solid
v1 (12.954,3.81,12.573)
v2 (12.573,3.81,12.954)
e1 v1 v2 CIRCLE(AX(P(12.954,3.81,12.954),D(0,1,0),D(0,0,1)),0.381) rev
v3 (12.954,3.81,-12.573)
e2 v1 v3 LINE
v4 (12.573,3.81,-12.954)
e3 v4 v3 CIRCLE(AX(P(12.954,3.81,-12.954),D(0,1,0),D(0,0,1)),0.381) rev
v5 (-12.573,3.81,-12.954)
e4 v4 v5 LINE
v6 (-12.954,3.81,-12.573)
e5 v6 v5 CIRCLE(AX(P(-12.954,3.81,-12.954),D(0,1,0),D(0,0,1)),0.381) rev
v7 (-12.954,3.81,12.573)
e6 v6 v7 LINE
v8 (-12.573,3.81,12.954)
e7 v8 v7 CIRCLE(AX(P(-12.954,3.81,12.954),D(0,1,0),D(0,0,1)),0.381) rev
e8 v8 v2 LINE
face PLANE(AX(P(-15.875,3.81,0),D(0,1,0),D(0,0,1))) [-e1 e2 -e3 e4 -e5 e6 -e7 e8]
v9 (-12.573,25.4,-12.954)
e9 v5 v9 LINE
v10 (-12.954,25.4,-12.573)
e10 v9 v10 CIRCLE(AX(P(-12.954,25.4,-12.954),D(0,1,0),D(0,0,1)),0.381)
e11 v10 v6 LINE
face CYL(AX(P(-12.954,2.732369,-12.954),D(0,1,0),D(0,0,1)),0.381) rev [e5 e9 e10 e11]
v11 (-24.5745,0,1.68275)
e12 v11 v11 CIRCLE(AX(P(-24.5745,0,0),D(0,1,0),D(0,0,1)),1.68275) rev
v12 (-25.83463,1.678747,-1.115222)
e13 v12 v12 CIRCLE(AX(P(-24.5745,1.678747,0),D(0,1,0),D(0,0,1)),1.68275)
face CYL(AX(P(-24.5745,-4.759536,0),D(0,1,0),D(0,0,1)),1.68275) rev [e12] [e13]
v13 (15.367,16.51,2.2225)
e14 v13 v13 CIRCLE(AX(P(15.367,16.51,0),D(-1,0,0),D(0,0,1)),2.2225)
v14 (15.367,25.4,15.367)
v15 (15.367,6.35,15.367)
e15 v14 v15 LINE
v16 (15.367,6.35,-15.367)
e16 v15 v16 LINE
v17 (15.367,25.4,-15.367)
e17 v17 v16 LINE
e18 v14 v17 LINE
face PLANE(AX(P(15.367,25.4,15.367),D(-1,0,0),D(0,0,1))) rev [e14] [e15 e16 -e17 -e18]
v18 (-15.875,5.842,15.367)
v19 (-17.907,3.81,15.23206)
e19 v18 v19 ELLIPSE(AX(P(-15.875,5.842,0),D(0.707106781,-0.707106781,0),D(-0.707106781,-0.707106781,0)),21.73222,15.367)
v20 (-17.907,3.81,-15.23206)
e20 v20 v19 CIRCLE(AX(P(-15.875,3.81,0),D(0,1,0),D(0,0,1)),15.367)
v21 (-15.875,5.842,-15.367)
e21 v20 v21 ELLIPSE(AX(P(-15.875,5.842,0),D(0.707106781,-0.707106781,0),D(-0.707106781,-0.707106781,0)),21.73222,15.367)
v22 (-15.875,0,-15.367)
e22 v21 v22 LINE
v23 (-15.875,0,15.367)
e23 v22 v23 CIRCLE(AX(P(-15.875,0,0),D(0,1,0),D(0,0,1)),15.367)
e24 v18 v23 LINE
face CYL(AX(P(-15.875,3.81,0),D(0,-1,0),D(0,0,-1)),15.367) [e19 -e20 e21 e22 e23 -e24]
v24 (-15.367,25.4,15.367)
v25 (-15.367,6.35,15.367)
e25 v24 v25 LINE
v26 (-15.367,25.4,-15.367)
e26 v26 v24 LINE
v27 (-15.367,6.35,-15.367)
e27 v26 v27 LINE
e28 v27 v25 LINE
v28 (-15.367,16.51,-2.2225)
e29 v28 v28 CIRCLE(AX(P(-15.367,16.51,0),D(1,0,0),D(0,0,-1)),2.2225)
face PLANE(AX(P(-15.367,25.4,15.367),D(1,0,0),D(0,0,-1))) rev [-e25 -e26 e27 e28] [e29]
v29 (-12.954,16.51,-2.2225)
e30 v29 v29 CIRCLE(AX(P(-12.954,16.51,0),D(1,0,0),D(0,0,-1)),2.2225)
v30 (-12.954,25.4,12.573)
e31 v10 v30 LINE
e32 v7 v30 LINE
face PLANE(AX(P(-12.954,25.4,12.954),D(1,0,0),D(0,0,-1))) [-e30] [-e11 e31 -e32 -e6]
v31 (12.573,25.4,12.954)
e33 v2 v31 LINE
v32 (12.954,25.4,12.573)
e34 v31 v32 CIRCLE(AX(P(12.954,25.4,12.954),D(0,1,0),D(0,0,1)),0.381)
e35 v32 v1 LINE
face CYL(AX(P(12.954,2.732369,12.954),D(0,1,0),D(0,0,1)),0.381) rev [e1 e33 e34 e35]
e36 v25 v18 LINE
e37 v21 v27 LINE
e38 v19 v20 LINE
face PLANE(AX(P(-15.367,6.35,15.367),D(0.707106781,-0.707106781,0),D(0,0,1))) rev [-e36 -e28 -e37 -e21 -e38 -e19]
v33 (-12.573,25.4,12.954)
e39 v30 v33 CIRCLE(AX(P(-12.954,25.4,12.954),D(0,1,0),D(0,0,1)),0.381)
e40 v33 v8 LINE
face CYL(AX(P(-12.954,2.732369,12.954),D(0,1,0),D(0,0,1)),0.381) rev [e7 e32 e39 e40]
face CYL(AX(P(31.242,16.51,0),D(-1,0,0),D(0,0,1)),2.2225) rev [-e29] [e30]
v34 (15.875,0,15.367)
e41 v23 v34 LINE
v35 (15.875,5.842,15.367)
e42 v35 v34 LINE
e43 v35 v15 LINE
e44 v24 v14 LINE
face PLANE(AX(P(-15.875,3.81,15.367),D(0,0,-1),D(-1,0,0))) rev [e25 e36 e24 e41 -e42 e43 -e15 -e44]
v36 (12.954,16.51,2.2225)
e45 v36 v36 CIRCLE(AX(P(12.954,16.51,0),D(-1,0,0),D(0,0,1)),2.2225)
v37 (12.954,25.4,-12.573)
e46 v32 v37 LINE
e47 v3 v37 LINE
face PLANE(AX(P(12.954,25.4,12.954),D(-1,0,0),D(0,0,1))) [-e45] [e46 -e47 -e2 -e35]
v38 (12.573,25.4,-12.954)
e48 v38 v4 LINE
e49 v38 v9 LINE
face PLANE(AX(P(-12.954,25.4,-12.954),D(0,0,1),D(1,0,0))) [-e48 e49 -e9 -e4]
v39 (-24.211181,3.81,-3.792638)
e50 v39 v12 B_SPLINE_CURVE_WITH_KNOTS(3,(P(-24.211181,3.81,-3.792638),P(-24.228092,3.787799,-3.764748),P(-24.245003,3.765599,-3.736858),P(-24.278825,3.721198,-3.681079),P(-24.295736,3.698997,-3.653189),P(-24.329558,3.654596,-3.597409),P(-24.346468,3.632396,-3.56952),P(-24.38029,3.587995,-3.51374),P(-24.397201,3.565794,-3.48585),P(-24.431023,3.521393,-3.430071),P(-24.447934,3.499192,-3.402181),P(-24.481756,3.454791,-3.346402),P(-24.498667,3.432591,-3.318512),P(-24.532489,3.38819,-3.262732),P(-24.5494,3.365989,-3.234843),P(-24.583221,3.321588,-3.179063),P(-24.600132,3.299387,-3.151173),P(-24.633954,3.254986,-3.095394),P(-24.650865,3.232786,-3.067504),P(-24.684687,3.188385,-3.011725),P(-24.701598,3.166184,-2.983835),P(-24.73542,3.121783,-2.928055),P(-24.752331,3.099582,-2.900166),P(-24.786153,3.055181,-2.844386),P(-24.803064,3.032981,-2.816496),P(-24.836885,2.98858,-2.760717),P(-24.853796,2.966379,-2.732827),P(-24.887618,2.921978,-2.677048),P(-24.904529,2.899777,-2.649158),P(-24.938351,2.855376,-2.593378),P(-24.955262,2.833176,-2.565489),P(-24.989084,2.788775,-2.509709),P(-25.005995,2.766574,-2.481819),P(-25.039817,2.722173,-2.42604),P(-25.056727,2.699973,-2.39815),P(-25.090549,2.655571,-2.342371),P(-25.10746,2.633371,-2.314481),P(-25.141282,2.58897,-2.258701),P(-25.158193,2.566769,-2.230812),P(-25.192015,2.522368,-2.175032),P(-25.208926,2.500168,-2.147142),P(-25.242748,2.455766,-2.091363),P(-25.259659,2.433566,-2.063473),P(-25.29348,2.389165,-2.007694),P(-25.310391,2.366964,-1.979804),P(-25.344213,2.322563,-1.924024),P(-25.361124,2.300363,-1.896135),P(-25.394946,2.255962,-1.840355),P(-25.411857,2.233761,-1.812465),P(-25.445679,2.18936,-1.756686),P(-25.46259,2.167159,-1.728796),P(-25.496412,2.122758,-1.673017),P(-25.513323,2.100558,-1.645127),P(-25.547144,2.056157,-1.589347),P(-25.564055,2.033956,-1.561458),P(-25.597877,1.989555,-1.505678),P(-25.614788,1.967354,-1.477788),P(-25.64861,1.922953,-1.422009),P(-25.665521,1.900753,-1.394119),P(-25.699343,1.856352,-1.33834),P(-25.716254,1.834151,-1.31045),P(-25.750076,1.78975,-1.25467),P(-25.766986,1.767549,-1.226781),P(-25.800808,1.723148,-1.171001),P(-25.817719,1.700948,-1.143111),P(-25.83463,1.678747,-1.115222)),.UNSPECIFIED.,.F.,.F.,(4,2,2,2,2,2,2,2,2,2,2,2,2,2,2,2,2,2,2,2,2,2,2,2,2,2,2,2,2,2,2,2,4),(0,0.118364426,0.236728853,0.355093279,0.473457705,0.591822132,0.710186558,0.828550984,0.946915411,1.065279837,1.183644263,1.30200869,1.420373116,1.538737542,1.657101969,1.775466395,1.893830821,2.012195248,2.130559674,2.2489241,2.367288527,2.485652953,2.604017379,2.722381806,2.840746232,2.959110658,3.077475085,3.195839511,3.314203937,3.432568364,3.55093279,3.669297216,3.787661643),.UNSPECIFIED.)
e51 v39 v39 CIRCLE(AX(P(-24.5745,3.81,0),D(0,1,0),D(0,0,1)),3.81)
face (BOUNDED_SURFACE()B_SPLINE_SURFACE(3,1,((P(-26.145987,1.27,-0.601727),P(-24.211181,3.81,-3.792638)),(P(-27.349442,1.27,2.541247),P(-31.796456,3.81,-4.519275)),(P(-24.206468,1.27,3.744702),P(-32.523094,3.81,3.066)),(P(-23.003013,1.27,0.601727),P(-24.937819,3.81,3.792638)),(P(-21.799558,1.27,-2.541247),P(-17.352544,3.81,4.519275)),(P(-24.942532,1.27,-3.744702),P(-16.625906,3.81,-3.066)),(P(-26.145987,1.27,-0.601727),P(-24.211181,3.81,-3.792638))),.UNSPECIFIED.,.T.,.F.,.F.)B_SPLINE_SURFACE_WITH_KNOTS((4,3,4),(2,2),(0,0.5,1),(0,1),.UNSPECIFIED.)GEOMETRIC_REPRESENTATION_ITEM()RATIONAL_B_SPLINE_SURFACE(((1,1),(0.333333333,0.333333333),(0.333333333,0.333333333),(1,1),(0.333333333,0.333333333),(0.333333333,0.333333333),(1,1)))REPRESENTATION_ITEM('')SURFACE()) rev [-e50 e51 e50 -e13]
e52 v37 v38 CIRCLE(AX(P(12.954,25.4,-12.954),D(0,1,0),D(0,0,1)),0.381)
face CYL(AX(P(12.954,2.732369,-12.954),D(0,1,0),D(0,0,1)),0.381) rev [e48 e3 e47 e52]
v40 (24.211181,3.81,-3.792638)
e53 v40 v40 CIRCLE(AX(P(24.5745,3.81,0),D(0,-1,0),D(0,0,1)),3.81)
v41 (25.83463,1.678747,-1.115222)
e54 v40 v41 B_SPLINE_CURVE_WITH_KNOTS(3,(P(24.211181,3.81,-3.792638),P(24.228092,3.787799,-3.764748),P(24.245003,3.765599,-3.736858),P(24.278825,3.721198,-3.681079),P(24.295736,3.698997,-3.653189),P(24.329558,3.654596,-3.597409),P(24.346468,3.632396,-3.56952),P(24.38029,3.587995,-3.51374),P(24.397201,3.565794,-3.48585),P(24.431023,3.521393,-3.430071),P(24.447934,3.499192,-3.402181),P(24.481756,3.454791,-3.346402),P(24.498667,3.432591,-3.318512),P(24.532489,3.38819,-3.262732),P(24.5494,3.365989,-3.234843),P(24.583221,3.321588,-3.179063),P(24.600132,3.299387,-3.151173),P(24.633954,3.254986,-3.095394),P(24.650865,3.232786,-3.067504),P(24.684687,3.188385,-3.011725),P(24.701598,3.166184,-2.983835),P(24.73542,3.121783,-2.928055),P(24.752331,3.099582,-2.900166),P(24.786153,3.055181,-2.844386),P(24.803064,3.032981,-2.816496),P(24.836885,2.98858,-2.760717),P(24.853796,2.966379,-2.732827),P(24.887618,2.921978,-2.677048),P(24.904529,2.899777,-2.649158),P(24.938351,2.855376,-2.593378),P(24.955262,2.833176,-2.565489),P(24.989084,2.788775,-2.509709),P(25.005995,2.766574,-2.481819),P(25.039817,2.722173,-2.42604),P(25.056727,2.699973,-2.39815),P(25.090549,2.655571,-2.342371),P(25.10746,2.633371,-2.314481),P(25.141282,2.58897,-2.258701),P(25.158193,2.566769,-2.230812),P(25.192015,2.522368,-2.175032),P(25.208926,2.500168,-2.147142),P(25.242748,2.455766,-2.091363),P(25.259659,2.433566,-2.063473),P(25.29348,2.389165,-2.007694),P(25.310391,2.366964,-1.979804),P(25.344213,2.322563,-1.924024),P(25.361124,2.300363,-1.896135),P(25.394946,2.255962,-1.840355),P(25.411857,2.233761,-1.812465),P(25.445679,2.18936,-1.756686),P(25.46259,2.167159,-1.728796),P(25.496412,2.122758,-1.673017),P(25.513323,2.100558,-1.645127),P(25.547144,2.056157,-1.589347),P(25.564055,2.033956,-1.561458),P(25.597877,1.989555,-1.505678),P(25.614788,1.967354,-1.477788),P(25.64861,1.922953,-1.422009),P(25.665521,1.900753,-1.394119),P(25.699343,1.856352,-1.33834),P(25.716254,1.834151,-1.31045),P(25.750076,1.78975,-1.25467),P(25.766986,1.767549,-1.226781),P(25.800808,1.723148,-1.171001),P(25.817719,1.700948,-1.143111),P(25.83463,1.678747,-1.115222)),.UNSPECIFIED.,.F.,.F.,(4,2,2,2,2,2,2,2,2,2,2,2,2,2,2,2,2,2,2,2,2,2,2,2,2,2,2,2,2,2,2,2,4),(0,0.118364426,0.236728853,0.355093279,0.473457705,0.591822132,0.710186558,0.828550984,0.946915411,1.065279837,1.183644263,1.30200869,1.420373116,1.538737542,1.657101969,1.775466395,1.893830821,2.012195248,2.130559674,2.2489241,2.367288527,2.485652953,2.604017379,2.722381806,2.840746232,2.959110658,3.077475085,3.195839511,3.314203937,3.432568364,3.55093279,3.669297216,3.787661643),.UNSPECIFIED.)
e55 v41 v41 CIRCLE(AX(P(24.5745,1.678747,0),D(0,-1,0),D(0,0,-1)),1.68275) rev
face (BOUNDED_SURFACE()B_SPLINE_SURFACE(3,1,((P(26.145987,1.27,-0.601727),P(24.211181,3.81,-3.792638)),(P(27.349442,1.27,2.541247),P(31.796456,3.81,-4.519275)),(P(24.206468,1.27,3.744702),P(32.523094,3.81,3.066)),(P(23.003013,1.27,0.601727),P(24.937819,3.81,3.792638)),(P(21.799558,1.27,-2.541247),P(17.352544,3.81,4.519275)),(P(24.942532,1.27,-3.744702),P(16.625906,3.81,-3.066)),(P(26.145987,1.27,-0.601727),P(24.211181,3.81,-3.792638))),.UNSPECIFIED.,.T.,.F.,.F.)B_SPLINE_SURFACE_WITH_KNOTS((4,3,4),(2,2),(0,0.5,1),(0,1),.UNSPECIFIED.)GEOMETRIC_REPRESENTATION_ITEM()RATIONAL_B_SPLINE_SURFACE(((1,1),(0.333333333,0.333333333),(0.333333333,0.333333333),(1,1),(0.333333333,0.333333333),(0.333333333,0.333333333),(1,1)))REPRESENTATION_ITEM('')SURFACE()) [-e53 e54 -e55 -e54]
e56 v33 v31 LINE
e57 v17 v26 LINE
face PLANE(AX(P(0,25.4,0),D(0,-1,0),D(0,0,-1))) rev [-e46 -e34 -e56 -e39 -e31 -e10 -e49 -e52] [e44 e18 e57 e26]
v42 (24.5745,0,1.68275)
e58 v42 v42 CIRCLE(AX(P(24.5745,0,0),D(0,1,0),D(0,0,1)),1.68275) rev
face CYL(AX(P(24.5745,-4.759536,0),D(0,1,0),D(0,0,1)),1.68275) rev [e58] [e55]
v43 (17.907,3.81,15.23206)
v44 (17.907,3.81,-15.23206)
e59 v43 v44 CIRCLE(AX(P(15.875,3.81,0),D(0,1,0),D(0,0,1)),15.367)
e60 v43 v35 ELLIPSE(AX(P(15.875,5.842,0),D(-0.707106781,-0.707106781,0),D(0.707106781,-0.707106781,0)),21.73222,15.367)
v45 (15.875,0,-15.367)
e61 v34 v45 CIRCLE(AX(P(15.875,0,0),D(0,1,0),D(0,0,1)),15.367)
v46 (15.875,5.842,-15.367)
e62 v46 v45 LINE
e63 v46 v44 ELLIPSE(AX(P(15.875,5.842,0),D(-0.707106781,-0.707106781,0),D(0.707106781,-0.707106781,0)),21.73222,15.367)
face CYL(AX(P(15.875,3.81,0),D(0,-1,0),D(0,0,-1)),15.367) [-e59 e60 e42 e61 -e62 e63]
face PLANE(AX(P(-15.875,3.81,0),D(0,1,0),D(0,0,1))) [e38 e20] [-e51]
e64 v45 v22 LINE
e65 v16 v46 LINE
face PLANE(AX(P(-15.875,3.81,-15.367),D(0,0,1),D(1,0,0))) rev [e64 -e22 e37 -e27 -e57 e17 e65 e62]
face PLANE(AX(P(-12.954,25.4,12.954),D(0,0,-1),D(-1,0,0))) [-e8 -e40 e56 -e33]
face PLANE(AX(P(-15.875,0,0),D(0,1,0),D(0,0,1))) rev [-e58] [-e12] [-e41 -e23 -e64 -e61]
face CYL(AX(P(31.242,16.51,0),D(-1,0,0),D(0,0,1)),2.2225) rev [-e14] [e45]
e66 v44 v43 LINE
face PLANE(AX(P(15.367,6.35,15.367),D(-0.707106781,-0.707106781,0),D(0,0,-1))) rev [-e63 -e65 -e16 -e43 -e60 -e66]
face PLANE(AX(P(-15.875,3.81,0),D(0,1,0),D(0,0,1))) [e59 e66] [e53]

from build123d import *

# Parameters (mm, degrees)
BOSS_EXTRUDE1_DEPTH     = 3.81
SKETCH2_W               = 30.734
SKETCH2_H               = 30.734
SKETCH2_W_2             = 25.908
SKETCH2_H_2             = 25.908
BOSS_EXTRUDE2_DEPTH     = 21.59
CHAMFER1_SIZE           = 2.54
SKETCH3_R               = 1.68275
CUT_EXTRUDE1_DEPTH      = 3.81
CUT_EXTRUDE2_DEPTH      = 54.240878222
CUT_EXTRUDE2_DEPTH_BACK = 54.240878222
SKETCH6_R               = 2.2225
SKETCH8_R               = 0.381
CUT_EXTRUDE3_DEPTH      = 21.59


with BuildPart() as part:
    # Sketch1 → Boss-Extrude1 (new body)
    with BuildSketch(Plane(origin=(0, 0, 0), x_dir=(1, 0, 0), z_dir=(0, 1, 0))):
        with BuildLine():
            Line((-15.875, 15.367), (15.875, 15.367))
            ThreePointArc((15.875, 15.367), (31.242, 0), (15.875, -15.367))
            Line((15.875, -15.367), (-15.875, -15.367))
            ThreePointArc((-15.875, -15.367), (-31.242, 0), (-15.875, 15.367))
        make_face()
    extrude(amount=BOSS_EXTRUDE1_DEPTH)

    # Sketch2 → Boss-Extrude2 (add)
    with BuildSketch(Plane(origin=(0, 3.81, 0), x_dir=(1, 0, 0), z_dir=(0, 1, 0))):
        Rectangle(SKETCH2_W, SKETCH2_H)
        Rectangle(SKETCH2_W_2, SKETCH2_H_2, mode=Mode.SUBTRACT)
    extrude(amount=BOSS_EXTRUDE2_DEPTH)

    # Chamfer1
    chamfer1_edges = [part.edges().sort_by_distance(p)[0] for p in [
        (15.367, 3.81, 0),
        (-15.367, 3.81, 0),
    ]]
    chamfer(chamfer1_edges, length=CHAMFER1_SIZE)

    # Sketch3 → Cut-Extrude1 (cut)
    with BuildSketch(Plane(origin=(0, 3.81, 0), x_dir=(1, 0, 0), z_dir=(0, 1, 0))):
        with Locations(Location((-24.5745, 0, 0), (0, 0, 270))):
            Circle(SKETCH3_R)
        with Locations(Location((24.5745, 0, 0), (0, 0, 270))):
            Circle(SKETCH3_R)
    extrude(amount=-CUT_EXTRUDE1_DEPTH, mode=Mode.SUBTRACT)

    # Cut-Loft1: read off the stored shape, not the designer's step
    # Cut-Loft1: loft between two sections, ruled curve by curve
    cut_loft1_from = [
        Edge.make_bspline([(-26.145987116, 1.27, -0.601727352), (-27.349441821, 1.27, 2.54124688), (-24.206467589, 1.27, 3.744701584), (-23.003012884, 1.27, 0.601727352), (-21.799558179, 1.27, -2.54124688), (-24.942532411, 1.27, -3.744701584), (-26.145987116, 1.27, -0.601727352)], [0, 0, 0, 0, 0.5, 0.5, 0.5, 1, 1, 1, 1], 3, [1, 0.333333333, 0.333333333, 1, 0.333333333, 0.333333333, 1]),
    ]
    cut_loft1_to = [
        Edge.make_bspline([(-24.211181072, 3.81, -3.79263752), (-31.796456111, 3.81, -4.519275376), (-32.523093968, 3.81, 3.065999663), (-24.937818928, 3.81, 3.79263752), (-17.352543889, 3.81, 4.519275376), (-16.625906032, 3.81, -3.065999663), (-24.211181072, 3.81, -3.79263752)], [0, 0, 0, 0, 0.5, 0.5, 0.5, 1, 1, 1, 1], 3, [1, 0.333333333, 0.333333333, 1, 0.333333333, 0.333333333, 1]),
    ]
    cut_loft1 = Solid(Shell([*[Face.make_surface_from_curves(cut_loft1_from[k], cut_loft1_to[k]) for k in range(1)], Face(Wire(cut_loft1_from)), Face(Wire(cut_loft1_to))]))
    add(cut_loft1, mode=Mode.SUBTRACT)

    # Mirror1: Cut-Loft1 across plane
    add(cut_loft1.mirror(Plane(origin=(0, 0, 0), x_dir=(0, 0, 1), z_dir=(1, 0, 0))), mode=Mode.SUBTRACT)

    # Sketch6 → Cut-Extrude2 (cut, two sides: drawn at the far end of the back side and taken through both)
    with BuildSketch(Plane.ZY.offset(-12.954).offset(-CUT_EXTRUDE2_DEPTH_BACK)):
        with Locations(Location((0, 16.51, 0), (0, 0, 180))):
            Circle(SKETCH6_R)
    extrude(amount=CUT_EXTRUDE2_DEPTH + CUT_EXTRUDE2_DEPTH_BACK, mode=Mode.SUBTRACT)

    # Sketch8 → Cut-Extrude3 (cut)
    with BuildSketch(Plane(origin=(0, 25.4, 0), x_dir=(1, 0, 0), z_dir=(0, 1, 0))):
        with Locations((-12.954, 12.954)):
            Circle(SKETCH8_R)
        with Locations((12.954, 12.954)):
            Circle(SKETCH8_R)
        with Locations((12.954, -12.954)):
            Circle(SKETCH8_R)
        with Locations((-12.954, -12.954)):
            Circle(SKETCH8_R)
    extrude(amount=-CUT_EXTRUDE3_DEPTH, mode=Mode.SUBTRACT)


solid = part.part
